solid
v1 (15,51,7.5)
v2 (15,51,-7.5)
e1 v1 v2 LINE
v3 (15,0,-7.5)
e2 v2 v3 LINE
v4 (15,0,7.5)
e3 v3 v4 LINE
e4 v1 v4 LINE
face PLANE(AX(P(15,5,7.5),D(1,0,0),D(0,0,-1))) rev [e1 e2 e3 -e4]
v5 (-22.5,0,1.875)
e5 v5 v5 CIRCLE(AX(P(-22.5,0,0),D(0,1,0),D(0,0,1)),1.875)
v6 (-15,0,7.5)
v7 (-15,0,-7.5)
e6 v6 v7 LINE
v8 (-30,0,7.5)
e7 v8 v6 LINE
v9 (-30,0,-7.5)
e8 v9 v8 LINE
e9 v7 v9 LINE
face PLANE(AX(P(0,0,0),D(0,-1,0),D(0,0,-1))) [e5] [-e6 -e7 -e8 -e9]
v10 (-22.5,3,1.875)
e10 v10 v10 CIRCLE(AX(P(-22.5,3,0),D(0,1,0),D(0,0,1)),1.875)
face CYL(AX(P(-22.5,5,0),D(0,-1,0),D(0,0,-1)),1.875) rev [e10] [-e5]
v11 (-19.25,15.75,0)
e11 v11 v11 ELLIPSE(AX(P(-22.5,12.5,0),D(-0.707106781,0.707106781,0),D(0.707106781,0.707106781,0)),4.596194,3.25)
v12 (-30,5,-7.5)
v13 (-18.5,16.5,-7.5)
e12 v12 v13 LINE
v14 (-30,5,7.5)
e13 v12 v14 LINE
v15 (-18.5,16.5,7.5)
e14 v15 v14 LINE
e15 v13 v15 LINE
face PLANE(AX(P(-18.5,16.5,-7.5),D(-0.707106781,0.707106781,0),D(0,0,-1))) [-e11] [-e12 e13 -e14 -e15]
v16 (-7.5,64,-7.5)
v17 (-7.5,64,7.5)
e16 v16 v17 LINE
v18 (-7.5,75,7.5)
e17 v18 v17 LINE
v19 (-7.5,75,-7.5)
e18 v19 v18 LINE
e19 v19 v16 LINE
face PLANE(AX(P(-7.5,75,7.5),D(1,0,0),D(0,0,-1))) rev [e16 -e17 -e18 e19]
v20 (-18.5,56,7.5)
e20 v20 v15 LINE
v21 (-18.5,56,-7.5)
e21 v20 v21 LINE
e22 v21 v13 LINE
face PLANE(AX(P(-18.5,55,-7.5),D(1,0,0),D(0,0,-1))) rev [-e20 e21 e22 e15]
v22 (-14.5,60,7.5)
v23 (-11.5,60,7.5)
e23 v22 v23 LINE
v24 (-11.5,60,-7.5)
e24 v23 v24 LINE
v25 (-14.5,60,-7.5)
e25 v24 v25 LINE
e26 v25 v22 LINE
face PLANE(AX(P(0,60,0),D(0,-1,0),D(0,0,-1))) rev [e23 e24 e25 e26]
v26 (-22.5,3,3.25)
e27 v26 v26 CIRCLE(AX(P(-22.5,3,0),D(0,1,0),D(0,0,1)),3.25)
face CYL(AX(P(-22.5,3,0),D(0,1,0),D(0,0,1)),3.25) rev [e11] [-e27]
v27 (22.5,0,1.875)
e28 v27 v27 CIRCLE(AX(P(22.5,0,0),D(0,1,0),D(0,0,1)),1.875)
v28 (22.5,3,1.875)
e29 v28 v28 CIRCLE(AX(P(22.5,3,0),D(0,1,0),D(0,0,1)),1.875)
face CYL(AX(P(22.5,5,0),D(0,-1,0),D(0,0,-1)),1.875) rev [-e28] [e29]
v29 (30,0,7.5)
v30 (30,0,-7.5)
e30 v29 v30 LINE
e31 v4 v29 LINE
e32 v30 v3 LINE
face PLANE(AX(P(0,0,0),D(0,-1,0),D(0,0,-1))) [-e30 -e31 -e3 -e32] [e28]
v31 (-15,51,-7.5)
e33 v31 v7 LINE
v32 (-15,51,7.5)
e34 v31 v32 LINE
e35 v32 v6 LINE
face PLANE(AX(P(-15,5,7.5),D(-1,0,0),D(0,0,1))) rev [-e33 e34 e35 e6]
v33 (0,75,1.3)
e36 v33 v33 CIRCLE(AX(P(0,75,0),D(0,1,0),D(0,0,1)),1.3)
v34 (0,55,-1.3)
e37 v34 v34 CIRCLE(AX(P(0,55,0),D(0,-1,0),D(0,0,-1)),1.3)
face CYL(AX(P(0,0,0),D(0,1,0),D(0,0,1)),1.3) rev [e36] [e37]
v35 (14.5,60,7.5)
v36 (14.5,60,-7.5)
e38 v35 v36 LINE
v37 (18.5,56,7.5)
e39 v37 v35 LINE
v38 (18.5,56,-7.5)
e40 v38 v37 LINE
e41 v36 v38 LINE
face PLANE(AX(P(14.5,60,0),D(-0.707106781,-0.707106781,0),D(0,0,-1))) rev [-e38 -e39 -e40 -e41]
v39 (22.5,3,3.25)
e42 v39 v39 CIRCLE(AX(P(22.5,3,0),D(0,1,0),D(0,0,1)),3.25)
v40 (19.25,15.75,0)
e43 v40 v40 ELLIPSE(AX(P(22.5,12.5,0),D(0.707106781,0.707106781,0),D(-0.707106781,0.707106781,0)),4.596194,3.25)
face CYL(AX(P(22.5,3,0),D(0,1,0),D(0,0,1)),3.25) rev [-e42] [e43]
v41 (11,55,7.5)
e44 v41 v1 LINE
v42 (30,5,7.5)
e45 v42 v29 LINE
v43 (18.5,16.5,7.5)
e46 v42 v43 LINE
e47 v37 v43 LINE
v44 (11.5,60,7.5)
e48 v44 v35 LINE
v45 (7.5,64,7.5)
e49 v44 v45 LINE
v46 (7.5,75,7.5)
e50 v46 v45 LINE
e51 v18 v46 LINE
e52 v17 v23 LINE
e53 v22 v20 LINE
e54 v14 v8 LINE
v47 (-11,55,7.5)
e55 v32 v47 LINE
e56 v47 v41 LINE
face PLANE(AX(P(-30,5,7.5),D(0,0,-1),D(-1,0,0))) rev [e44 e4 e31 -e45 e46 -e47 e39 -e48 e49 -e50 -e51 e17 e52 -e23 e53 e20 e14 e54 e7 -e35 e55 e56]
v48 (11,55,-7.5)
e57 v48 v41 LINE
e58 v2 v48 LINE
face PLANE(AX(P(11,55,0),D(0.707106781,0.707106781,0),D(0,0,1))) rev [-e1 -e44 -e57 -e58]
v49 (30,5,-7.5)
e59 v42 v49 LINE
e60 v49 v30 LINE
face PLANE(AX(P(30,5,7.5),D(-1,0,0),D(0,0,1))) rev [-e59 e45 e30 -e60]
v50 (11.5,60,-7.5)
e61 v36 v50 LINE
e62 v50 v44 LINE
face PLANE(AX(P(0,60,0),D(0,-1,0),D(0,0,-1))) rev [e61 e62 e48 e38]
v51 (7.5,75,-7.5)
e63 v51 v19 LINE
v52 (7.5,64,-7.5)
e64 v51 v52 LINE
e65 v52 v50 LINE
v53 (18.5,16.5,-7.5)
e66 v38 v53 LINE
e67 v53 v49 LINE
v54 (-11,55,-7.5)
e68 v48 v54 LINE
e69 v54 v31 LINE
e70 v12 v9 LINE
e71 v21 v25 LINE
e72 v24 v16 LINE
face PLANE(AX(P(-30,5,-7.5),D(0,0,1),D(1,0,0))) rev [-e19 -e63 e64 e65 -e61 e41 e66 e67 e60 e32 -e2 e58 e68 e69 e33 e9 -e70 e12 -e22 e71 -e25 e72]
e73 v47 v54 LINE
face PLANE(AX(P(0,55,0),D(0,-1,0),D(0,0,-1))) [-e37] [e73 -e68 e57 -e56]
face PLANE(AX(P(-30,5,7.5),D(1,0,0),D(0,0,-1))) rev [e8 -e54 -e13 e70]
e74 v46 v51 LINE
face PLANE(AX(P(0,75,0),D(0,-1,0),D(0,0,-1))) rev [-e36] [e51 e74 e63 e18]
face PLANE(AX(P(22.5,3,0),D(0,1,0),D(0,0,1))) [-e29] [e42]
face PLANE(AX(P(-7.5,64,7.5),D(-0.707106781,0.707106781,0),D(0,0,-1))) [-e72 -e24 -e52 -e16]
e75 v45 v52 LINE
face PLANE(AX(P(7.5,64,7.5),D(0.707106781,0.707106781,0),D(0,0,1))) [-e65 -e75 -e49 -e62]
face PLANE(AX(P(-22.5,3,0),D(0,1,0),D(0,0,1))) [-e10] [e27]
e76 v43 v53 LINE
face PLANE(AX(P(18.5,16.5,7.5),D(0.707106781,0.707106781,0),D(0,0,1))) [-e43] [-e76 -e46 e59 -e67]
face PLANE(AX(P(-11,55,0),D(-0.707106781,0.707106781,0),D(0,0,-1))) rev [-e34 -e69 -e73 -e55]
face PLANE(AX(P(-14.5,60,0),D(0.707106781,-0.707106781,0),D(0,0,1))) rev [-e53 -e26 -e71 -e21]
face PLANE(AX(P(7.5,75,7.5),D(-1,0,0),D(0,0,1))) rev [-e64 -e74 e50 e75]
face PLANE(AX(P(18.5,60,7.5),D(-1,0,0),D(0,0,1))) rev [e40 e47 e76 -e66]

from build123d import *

# Parameters (mm, degrees)
SKETCH1_W             = 15
SKETCH1_H             = 15
SKETCH1_R             = 1.875
BOSS_EXTRUDE1_DEPTH   = 5
BOSS_EXTRUDE1_2_DEPTH = 5
SKETCH2_W             = 3.5
SKETCH2_H             = 15
BOSS_EXTRUDE2_DEPTH   = 50
SKETCH4_W             = 37
SKETCH4_H             = 15
BOSS_EXTRUDE3_DEPTH   = 5
SKETCH5_W             = 15
SKETCH5_H             = 15
BOSS_EXTRUDE4_DEPTH   = 15
SKETCH6_R             = 1.3
CUT_EXTRUDE1_DEPTH    = 82.124903698
CHAMFER1_SIZE         = 4
SKETCH7_R             = 3.25
CUT_EXTRUDE2_DEPTH    = 2
CHAMFER2_SIZE         = 11.5


with BuildPart() as part:
    # Sketch1 → Boss-Extrude1 (new body)
    with BuildSketch(Plane(origin=(0, 0, 0), x_dir=(1, 0, 0), z_dir=(0, 1, 0))):
        with Locations((-22.5, 0)):
            Rectangle(SKETCH1_W, SKETCH1_H)
        with Locations(Location((-22.5, 0, 0), (0, 0, 270))):
            Circle(SKETCH1_R, mode=Mode.SUBTRACT)
    extrude(amount=BOSS_EXTRUDE1_DEPTH)



with BuildPart() as body_2:
    # Sketch1 → Boss-Extrude1 2 (new body)
    with BuildSketch(Plane(origin=(0, 0, 0), x_dir=(1, 0, 0), z_dir=(0, 1, 0))):
        with Locations((22.5, 0)):
            Rectangle(SKETCH1_W, SKETCH1_H)
        with Locations(Location((22.5, 0, 0), (0, 0, 270))):
            Circle(SKETCH1_R, mode=Mode.SUBTRACT)
    extrude(amount=BOSS_EXTRUDE1_2_DEPTH)


with BuildPart() as part_1:
    add(part.part)

    add(body_2.part)  # Boss-Extrude2 merges body 2
    # Sketch2 → Boss-Extrude2 (add)
    with BuildSketch(Plane(origin=(0, 5, 0), x_dir=(1, 0, 0), z_dir=(0, 1, 0))):
        with Locations((-16.75, 0)):
            Rectangle(SKETCH2_W, SKETCH2_H)
        with Locations((16.75, 0)):
            Rectangle(SKETCH2_W, SKETCH2_H)
    extrude(amount=BOSS_EXTRUDE2_DEPTH)

    # Sketch4 → Boss-Extrude3 (add)
    with BuildSketch(Plane(origin=(0, 55, 0), x_dir=(1, 0, 0), z_dir=(0, 1, 0))):
        Rectangle(SKETCH4_W, SKETCH4_H)
    extrude(amount=BOSS_EXTRUDE3_DEPTH)

    # Sketch5 → Boss-Extrude4 (add)
    with BuildSketch(Plane(origin=(0, 60, 0), x_dir=(1, 0, 0), z_dir=(0, 1, 0))):
        Rectangle(SKETCH5_W, SKETCH5_H)
    extrude(amount=BOSS_EXTRUDE4_DEPTH)

    # Sketch6 → Cut-Extrude1 (cut, through all)
    with BuildSketch(Plane(origin=(0, 75, 0), x_dir=(1, 0, 0), z_dir=(0, 1, 0))):
        with Locations(Location((0, 0, 0), (0, 0, 270))):
            Circle(SKETCH6_R)
    extrude(amount=-CUT_EXTRUDE1_DEPTH, mode=Mode.SUBTRACT)

    # Chamfer1
    chamfer1_edges = [part_1.edges().sort_by_distance(p)[0] for p in [
        (-15, 55, 0),
        (-18.5, 60, 0),
        (18.5, 60, 0),
        (15, 55, 0),
        (7.5, 60, 0),
        (-7.5, 60, 0),
    ]]
    chamfer(chamfer1_edges, length=CHAMFER1_SIZE)

    # Sketch7 → Cut-Extrude2 (cut)
    with BuildSketch(Plane(origin=(0, 5, 0), x_dir=(1, 0, 0), z_dir=(0, 1, 0))):
        with Locations(Location((-22.5, 0, 0), (0, 0, 270))):
            Circle(SKETCH7_R)
        with Locations(Location((22.5, 0, 0), (0, 0, 270))):
            Circle(SKETCH7_R)
    extrude(amount=-CUT_EXTRUDE2_DEPTH, mode=Mode.SUBTRACT)

    # Chamfer2
    # the kernel refuses this chamfer: 11.5 mm, written as the material it adds along each edge
    with BuildSketch(Plane(origin=(18.5, 5, 7.5), x_dir=(0.9996219169112968, -0.02749587661058638, 0), z_dir=(0, 0, -1))) as chamfer2_piece_1_section:
        Polygon((CHAMFER2_SIZE * 0.999621916911, -CHAMFER2_SIZE * 0.0274958766106), (-CHAMFER2_SIZE * 0.0274958766106, -CHAMFER2_SIZE * 0.999621916911), (0, 0), align=None)
    chamfer2_piece_1 = extrude(amount=15, mode=Mode.PRIVATE)
    chamfer2_piece_1 = split(chamfer2_piece_1, bisect_by=Plane(origin=(30, 6.904321088, -5), z_dir=(-1, 0, 0)), keep=Keep.TOP, mode=Mode.PRIVATE)
    chamfer2_piece_1 = chamfer2_piece_1 - Plane(origin=(22.5, 6.904321088, 0), x_dir=(0, 0, 1), z_dir=(0, 1, 0)) * Cylinder(3.25, 76, mode=Mode.PRIVATE)
    add(chamfer2_piece_1)
    with BuildSketch(Plane(origin=(-18.5, 5, -7.5), x_dir=(-0.9996219169112968, -0.02749587661058638, 0), z_dir=(0, 0, 1))) as chamfer2_piece_2_section:
        Polygon((CHAMFER2_SIZE * 0.999621916911, -CHAMFER2_SIZE * 0.0274958766106), (-CHAMFER2_SIZE * 0.0274958766106, -CHAMFER2_SIZE * 0.999621916911), (0, 0), align=None)
    chamfer2_piece_2 = extrude(amount=15, mode=Mode.PRIVATE)
    chamfer2_piece_2 = split(chamfer2_piece_2, bisect_by=Plane(origin=(-30, 6.90432124, 5), z_dir=(1, 0, 0)), keep=Keep.TOP, mode=Mode.PRIVATE)
    chamfer2_piece_2 = chamfer2_piece_2 - Plane(origin=(-22.5, 6.90432124, 0), x_dir=(0, 0, 1), z_dir=(0, 1, 0)) * Cylinder(3.25, 76, mode=Mode.PRIVATE)
    add(chamfer2_piece_2)


solid = part_1.part
